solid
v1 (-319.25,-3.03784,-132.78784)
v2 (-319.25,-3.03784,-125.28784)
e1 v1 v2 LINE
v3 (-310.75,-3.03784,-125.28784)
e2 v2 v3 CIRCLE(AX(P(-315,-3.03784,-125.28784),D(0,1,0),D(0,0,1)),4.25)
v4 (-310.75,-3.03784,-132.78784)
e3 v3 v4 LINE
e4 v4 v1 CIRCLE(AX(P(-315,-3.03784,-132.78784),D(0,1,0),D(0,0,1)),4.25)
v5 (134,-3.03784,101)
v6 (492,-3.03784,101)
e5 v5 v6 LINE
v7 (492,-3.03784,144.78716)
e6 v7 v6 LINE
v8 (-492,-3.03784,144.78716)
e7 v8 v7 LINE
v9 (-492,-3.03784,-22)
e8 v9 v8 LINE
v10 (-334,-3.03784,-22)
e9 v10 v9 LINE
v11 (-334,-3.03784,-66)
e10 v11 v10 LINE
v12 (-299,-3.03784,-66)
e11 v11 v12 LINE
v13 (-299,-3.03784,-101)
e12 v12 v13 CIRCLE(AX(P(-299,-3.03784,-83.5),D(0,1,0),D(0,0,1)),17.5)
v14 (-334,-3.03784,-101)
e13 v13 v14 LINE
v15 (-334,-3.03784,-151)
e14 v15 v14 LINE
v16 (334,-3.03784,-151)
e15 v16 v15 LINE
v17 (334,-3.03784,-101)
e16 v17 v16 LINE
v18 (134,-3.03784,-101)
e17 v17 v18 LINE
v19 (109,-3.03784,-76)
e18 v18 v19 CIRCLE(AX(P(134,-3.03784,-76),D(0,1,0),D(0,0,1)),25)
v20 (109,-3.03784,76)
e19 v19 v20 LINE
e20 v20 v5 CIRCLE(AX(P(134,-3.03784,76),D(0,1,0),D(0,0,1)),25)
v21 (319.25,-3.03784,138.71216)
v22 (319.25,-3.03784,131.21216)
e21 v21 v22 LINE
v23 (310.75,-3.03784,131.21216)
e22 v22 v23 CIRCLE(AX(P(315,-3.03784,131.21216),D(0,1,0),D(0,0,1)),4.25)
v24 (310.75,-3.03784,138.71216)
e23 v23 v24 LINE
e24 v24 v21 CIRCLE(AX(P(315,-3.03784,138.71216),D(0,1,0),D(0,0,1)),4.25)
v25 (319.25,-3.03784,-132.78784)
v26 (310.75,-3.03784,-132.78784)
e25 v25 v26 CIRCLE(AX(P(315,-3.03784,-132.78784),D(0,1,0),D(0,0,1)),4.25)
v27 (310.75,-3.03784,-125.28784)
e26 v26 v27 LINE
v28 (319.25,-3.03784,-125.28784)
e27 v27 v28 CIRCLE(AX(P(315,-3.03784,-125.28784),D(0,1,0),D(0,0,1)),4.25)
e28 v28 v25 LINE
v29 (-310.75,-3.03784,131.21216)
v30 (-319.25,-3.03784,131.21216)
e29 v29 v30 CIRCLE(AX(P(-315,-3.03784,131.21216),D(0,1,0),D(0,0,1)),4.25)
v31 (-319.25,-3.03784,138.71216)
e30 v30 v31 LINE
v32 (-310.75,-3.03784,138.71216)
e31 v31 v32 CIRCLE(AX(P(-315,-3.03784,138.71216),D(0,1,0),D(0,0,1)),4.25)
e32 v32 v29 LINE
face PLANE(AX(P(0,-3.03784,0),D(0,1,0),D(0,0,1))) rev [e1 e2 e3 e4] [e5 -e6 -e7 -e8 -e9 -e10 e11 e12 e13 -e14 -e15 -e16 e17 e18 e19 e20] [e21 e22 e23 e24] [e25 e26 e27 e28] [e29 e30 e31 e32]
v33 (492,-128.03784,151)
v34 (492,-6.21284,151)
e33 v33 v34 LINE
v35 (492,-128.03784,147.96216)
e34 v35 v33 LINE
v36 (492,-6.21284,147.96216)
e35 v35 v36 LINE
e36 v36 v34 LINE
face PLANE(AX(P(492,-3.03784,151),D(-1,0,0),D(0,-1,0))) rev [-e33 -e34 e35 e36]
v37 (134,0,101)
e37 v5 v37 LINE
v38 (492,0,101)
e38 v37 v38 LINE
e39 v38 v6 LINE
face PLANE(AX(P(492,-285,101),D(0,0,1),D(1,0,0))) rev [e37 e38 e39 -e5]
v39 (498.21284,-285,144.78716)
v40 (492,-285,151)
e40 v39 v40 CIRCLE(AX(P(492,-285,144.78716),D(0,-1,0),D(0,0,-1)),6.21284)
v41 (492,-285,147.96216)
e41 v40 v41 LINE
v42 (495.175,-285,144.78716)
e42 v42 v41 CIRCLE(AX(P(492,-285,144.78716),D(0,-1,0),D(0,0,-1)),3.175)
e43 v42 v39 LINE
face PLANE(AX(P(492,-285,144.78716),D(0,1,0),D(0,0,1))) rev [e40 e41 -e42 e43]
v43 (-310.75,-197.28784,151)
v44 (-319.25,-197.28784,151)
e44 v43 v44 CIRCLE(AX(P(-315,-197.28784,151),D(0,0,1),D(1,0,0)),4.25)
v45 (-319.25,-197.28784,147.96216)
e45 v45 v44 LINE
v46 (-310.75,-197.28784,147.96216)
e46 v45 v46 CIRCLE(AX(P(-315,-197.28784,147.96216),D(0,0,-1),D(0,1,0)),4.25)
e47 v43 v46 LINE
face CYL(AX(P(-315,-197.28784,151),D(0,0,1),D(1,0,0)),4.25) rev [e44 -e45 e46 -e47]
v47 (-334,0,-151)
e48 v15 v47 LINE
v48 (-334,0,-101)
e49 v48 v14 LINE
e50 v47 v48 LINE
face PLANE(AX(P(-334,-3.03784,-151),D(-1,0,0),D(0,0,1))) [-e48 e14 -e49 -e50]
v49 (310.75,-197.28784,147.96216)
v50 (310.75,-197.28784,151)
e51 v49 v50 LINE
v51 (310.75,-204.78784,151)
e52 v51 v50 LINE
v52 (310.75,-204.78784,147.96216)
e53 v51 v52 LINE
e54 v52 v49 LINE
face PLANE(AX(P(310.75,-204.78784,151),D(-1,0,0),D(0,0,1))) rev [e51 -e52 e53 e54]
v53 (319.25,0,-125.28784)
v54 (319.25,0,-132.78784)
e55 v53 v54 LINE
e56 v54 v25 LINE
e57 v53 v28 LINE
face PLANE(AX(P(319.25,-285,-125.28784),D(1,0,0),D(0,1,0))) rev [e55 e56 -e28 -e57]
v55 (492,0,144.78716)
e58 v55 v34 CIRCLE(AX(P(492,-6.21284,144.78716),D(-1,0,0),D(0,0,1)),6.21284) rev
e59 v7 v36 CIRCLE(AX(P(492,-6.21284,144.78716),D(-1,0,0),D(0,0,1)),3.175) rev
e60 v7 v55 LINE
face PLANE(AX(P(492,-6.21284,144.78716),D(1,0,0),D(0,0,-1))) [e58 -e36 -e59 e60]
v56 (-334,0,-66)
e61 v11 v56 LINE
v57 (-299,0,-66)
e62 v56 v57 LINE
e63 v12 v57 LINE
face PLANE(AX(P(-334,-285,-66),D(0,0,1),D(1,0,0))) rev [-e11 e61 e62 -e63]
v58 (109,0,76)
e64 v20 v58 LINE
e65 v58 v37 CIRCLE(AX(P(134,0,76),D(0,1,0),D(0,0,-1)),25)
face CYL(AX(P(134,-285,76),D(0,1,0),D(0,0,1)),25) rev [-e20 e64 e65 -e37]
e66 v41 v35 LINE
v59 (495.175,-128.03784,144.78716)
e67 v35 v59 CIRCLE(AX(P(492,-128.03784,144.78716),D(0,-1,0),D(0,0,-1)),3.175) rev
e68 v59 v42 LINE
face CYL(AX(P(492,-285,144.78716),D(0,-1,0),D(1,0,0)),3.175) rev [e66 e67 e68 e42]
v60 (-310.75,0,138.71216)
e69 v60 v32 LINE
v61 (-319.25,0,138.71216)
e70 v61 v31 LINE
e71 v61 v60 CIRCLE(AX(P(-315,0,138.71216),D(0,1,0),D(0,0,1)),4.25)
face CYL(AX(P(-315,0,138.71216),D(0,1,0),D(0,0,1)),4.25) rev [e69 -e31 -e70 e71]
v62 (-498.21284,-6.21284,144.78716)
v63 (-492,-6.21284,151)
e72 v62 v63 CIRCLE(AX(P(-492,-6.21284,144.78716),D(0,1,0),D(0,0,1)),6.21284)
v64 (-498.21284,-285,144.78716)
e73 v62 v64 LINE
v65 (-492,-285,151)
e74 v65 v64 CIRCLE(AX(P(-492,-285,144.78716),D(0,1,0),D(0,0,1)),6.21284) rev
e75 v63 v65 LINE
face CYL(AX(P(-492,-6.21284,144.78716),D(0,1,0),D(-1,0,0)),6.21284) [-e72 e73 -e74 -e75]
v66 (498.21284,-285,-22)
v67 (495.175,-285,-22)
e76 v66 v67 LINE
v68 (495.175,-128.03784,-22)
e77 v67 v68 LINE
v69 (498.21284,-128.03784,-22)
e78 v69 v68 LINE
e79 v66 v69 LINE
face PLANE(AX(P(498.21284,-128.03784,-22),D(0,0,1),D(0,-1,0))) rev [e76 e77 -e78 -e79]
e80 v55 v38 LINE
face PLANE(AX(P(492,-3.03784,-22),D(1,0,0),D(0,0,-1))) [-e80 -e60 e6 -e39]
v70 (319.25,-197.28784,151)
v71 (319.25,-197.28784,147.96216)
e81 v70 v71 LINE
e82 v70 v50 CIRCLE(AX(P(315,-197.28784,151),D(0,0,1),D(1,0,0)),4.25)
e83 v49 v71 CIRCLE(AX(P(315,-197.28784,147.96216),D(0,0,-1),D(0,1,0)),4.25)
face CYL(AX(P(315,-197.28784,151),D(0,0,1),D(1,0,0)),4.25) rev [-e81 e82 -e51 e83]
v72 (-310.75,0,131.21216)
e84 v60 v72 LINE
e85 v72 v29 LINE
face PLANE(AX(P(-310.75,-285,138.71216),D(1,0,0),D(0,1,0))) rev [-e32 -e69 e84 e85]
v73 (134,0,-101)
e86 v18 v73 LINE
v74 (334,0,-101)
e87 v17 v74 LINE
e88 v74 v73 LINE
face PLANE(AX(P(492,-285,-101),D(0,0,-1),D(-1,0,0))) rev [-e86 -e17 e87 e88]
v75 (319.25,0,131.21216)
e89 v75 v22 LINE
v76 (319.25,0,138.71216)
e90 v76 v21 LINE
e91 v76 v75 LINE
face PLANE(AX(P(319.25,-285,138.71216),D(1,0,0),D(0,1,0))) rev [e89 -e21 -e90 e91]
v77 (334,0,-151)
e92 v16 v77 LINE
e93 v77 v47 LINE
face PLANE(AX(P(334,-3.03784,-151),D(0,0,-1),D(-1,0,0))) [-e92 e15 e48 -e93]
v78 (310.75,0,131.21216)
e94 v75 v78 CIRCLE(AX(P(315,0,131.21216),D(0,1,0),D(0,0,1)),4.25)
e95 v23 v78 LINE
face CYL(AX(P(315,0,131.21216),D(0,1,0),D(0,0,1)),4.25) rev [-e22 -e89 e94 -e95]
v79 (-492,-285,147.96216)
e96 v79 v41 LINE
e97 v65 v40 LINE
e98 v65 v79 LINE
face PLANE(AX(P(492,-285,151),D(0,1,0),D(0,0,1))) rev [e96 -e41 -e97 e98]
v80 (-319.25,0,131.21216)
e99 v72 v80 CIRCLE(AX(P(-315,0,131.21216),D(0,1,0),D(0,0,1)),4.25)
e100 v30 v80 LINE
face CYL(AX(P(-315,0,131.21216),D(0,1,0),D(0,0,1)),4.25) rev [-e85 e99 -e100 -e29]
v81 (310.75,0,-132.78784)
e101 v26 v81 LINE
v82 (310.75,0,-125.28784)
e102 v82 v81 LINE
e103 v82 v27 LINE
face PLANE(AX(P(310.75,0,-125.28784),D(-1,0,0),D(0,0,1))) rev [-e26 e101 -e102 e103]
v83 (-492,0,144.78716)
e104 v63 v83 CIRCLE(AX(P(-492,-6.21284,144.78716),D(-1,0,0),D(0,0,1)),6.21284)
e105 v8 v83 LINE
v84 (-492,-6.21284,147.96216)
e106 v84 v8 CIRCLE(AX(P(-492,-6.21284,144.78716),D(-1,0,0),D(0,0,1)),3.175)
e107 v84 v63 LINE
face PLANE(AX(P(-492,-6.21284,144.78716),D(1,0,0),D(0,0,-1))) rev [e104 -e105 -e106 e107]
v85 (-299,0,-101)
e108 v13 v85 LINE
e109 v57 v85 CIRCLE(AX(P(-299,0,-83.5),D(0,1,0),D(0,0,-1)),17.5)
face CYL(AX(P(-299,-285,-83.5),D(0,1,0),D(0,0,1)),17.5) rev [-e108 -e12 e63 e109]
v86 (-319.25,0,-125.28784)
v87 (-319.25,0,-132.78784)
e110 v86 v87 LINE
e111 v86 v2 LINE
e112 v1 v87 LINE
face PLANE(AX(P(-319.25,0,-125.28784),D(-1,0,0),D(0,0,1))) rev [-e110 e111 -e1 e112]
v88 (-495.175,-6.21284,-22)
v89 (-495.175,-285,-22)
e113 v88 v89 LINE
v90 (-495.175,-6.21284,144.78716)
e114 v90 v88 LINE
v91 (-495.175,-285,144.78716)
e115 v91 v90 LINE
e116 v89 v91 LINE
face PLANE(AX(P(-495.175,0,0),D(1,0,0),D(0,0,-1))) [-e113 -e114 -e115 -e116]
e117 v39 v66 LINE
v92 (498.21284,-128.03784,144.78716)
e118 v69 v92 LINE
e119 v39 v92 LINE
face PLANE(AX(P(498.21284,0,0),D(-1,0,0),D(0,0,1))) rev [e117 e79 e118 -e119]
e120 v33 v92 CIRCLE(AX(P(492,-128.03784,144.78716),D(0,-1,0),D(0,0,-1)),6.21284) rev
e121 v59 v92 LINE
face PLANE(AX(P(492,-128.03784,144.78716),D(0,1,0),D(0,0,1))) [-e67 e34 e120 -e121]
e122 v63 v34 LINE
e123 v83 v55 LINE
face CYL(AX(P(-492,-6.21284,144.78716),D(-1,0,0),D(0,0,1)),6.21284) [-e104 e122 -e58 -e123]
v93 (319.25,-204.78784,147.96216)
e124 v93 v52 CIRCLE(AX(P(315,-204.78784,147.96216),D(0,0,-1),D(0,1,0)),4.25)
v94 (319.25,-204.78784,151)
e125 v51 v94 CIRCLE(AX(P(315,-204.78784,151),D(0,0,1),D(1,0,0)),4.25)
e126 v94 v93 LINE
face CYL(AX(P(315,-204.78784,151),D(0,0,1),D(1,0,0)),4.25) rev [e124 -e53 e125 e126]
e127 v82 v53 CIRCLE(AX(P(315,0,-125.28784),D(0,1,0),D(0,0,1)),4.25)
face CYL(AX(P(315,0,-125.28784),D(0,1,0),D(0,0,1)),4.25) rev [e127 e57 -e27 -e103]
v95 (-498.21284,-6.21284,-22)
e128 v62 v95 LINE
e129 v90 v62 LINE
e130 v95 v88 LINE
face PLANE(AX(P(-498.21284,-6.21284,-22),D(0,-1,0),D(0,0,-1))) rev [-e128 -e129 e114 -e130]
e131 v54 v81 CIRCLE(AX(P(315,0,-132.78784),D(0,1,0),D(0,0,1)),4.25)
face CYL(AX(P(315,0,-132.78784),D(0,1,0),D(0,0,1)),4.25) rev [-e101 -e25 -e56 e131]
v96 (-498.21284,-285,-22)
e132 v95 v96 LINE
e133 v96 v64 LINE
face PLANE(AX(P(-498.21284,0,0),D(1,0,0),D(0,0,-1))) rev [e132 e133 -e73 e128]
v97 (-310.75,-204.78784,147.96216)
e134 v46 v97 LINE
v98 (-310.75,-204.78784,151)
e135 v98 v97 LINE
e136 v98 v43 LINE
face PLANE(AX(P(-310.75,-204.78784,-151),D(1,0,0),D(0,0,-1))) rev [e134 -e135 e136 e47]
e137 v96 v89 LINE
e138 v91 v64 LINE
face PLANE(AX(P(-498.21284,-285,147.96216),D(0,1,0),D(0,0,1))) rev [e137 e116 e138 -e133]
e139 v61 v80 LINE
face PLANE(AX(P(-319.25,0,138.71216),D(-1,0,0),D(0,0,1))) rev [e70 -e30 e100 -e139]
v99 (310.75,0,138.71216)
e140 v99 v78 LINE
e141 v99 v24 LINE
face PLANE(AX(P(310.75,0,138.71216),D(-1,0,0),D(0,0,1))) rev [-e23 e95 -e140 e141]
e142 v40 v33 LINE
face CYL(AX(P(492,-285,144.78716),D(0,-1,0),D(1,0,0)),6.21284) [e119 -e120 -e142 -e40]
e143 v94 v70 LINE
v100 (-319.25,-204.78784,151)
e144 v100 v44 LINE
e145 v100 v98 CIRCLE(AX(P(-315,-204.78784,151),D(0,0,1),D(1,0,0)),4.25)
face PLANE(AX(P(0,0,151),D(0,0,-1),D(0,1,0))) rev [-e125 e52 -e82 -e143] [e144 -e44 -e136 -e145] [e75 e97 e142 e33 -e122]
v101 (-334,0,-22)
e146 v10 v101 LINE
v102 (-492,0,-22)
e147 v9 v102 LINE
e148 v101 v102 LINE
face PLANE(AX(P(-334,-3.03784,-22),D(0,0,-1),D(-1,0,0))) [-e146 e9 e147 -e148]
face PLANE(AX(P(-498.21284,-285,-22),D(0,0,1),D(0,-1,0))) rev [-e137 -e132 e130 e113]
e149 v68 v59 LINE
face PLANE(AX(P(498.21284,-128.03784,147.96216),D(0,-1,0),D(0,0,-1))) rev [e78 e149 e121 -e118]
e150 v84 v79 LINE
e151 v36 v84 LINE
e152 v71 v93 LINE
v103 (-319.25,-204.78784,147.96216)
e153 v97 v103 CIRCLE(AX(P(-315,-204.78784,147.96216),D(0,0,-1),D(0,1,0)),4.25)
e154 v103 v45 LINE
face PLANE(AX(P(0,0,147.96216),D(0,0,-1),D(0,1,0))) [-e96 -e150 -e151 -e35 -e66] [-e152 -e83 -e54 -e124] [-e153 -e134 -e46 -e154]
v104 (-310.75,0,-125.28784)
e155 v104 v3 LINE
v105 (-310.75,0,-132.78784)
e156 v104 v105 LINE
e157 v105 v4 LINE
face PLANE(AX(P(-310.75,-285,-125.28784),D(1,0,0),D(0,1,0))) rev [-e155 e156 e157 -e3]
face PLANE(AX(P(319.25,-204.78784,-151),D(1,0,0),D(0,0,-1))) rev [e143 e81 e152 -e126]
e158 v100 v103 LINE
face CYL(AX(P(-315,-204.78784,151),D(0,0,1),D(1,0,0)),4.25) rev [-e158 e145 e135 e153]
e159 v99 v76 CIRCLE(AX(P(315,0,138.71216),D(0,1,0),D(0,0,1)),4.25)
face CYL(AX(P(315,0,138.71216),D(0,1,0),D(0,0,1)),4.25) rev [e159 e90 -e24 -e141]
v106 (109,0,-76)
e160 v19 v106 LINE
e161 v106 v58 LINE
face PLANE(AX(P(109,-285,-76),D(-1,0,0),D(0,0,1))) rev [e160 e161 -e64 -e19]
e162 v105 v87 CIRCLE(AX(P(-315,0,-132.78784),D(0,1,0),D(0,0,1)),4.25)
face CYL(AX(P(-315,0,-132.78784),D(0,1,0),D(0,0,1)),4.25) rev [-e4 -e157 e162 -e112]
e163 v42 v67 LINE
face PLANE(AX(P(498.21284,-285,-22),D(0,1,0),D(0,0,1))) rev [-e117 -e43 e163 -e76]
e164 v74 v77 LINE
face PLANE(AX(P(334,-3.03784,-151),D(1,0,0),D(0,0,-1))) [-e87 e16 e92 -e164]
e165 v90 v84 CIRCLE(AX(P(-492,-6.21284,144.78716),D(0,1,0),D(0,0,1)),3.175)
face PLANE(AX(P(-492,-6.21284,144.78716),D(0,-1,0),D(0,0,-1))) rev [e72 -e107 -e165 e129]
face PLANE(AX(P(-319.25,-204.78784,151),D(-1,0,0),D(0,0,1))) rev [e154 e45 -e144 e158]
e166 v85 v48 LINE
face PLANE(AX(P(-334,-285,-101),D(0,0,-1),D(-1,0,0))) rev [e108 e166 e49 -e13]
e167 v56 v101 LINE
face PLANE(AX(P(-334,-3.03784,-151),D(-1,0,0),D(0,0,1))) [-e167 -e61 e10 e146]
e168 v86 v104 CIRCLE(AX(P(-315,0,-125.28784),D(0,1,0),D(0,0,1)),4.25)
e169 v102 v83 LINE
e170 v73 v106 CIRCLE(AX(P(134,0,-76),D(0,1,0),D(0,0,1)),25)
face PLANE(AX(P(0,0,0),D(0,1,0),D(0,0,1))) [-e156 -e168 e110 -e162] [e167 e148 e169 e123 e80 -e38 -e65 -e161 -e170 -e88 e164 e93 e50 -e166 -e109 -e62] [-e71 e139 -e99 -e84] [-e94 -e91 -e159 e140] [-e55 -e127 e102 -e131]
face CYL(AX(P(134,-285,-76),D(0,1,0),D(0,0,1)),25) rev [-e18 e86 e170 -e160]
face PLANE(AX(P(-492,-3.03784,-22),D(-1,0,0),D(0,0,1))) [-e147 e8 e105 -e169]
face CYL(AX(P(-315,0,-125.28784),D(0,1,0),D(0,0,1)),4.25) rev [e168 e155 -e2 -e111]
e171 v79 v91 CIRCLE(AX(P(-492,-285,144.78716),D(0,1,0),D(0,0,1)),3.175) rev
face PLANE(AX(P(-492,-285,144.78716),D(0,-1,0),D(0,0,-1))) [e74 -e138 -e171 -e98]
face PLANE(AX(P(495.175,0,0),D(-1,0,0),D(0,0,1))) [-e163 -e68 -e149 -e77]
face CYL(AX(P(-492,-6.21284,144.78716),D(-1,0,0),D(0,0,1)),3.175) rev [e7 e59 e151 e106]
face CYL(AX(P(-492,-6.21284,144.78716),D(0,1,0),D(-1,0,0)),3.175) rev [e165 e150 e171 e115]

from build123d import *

# Parameters (mm, degrees)
BASE_FLANGE1_DEPTH           = 3.03784
EDGE_FLANGE1_STRIP_W         = 18.50136
EDGE_FLANGE1_STRIP_H         = 3.03784
EDGE_FLANGE1_STRIP_CUT_DEPTH = 984
EDGE_FLANGE1_DEPTH           = 984
EDGE_FLANGE2_DEPTH           = 278.78716
EDGE_FLANGE2_BEND_DEPTH      = 156.962160064
CUT_EXTRUDE1_DEPTH           = 594.499817979
CUT_EXTRUDE2_DEPTH           = 594.499817979
M6_START                     = -3.03784
M6_CLEARANCE_SLOT1_DEPTH     = 3.03784
M6_START_2                   = 147.96216
M6_CLEARANCE_SLOT2_DEPTH     = 3.03784


# Read off the part's stored shape, not the designer's step: M6 Clearance Slot1, M6 Clearance Slot2
# Sheet-metal steps are written as plain solids
with BuildPart() as part:
    # Sketch1 → Base-Flange1 (new body)
    with BuildSketch(Plane(origin=(0, 0, 0), x_dir=(1, 0, 0), z_dir=(0, 1, 0))):
        Polygon((334, 151), (-334, 151), (-334, 22), (-492, 22), (-492, -151), (334, -151), (492, -151), (492, 22), (334, 22), align=None)
    extrude(amount=-BASE_FLANGE1_DEPTH)

    # Edge-Flange1 strip (across the edge) → Edge-Flange1 strip cut (cut)
    with BuildSketch(Plane(origin=(492, -3.03784, 151), x_dir=(0, 0, -1), z_dir=(-1, 0, 0))):
        with Locations((-3.03784, -1.51892)):
            Rectangle(EDGE_FLANGE1_STRIP_W, EDGE_FLANGE1_STRIP_H)
    extrude(amount=EDGE_FLANGE1_STRIP_CUT_DEPTH, mode=Mode.SUBTRACT)

    # Edge-Flange1 section (across the edge) → Edge-Flange1 (add)
    with BuildSketch(Plane(origin=(492, -3.03784, 151), x_dir=(0, 0, -1), z_dir=(-1, 0, 0))):
        with BuildLine():
            Line((0, 3.175), (0, 281.96216))
            Line((0, 281.96216), (3.03784, 281.96216))
            Line((3.03784, 281.96216), (3.03784, 3.175))
            ThreePointArc((3.03784, 3.175), (3.96777597, 0.92993597), (6.21284, 0))
            Line((6.21284, 0), (6.21284, -3.03784))
            ThreePointArc((6.21284, -3.03784), (1.819698706, -1.218141294), (0, 3.175))
        make_face()
    extrude(amount=EDGE_FLANGE1_DEPTH)

    # Edge-Flange2 section (across the edge) → Edge-Flange2 (add)
    with BuildSketch(Plane(origin=(-495.175, -285, 147.96216), x_dir=(1, 0, 0), z_dir=(0, 1, 0))):
        with BuildLine():
            Line((-3.03784, 3.175), (-3.03784, 169.96216))
            Line((-3.03784, 169.96216), (0, 169.96216))
            Line((0, 169.96216), (0, 3.175))
            ThreePointArc((0, 3.175), (0.92993597, 0.92993597), (3.175, 0))
            Line((3.175, 0), (3.175, -3.03784))
            ThreePointArc((3.175, -3.03784), (-1.218141294, -1.218141294), (-3.03784, 3.175))
        make_face()
    extrude(amount=EDGE_FLANGE2_DEPTH)

    # Edge-Flange2 section 2 (across the edge) → Edge-Flange2 bend (add)
    with BuildSketch(Plane(origin=(495.175, -128.037839936, 147.96216), x_dir=(-1, 0, 0), z_dir=(0, -1, 0))):
        with BuildLine():
            Line((-3.03784, 3.175), (-3.03784, 169.96216))
            Line((-3.03784, 169.96216), (0, 169.96216))
            Line((0, 169.96216), (0, 3.175))
            ThreePointArc((0, 3.175), (0.92993597, 0.92993597), (3.175, 0))
            Line((3.175, 0), (3.175, -3.03784))
            ThreePointArc((3.175, -3.03784), (-1.218141294, -1.218141294), (-3.03784, 3.175))
        make_face()
    extrude(amount=EDGE_FLANGE2_BEND_DEPTH)

    # Sketch15 → Cut-Extrude1 (cut, through all)
    with BuildSketch(Plane(origin=(0, 0, 0), x_dir=(1, 0, 0), z_dir=(0, 1, 0))):
        with BuildLine():
            Line((492, 100.999999924), (134, 100.999999924))
            ThreePointArc((134, 100.999999924), (116.32233047, 93.677669454), (109, 75.999999924))
            Line((109, 75.999999924), (109, -76))
            ThreePointArc((109, -76), (116.32233047, -93.67766953), (134, -101))
            Line((134, -101), (492, -101))
            Line((492, -101), (492, 100.999999924))
        make_face()
    extrude(amount=-CUT_EXTRUDE1_DEPTH, mode=Mode.SUBTRACT)

    # Sketch16 → Cut-Extrude2 (cut, through all)
    with BuildSketch(Plane(origin=(0, 0, 0), x_dir=(1, 0, 0), z_dir=(0, 1, 0))):
        with BuildLine():
            Line((-334, 101), (-299, 101))
            ThreePointArc((-299, 101), (-281.5, 83.5), (-299, 66))
            Line((-299, 66), (-334, 66))
            Line((-334, 66), (-334, 101))
        make_face()
    extrude(amount=-CUT_EXTRUDE2_DEPTH, mode=Mode.SUBTRACT)

    # M6 Clearance Slot1 outline → M6 Clearance Slot1 (cut)
    with BuildSketch(Plane(origin=(0, 0, 0), x_dir=(1, 0, 0), z_dir=(0, 1, 0)).offset(M6_START)):
        with BuildLine():
            Line((319.25, 125.287839814), (319.25, 132.787839814))
            ThreePointArc((319.25, 132.787839814), (315, 137.037839814), (310.75, 132.787839814))
            Line((310.75, 132.787839814), (310.75, 125.287839814))
            ThreePointArc((310.75, 125.287839814), (315, 121.037839814), (319.25, 125.287839814))
        make_face()
        with BuildLine():
            ThreePointArc((319.25, -131.212160186), (315, -126.962160186), (310.75, -131.212160186))
            Line((310.75, -131.212160186), (310.75, -138.712160186))
            ThreePointArc((310.75, -138.712160186), (315, -142.962160186), (319.25, -138.712160186))
            Line((319.25, -138.712160186), (319.25, -131.212160186))
        make_face()
        with BuildLine():
            ThreePointArc((-310.75, -131.212160186), (-315, -126.962160186), (-319.25, -131.212160186))
            Line((-319.25, -131.212160186), (-319.25, -138.712160186))
            ThreePointArc((-319.25, -138.712160186), (-315, -142.962160186), (-310.75, -138.712160186))
            Line((-310.75, -138.712160186), (-310.75, -131.212160186))
        make_face()
        with BuildLine():
            ThreePointArc((-310.75, 132.787839814), (-315, 137.037839814), (-319.25, 132.787839814))
            Line((-319.25, 132.787839814), (-319.25, 125.287839814))
            ThreePointArc((-319.25, 125.287839814), (-315, 121.037839814), (-310.75, 125.287839814))
            Line((-310.75, 125.287839814), (-310.75, 132.787839814))
        make_face()
    extrude(amount=M6_CLEARANCE_SLOT1_DEPTH, mode=Mode.SUBTRACT)

    # M6 Clearance Slot2 outline → M6 Clearance Slot2 (cut)
    with BuildSketch(Plane.XY.offset(M6_START_2)):
        with BuildLine():
            ThreePointArc((319.250000047, -197.28784), (315.000000047, -193.03784), (310.750000047, -197.28784))
            Line((310.750000047, -197.28784), (310.750000047, -204.78784))
            ThreePointArc((310.750000047, -204.78784), (315.000000047, -209.03784), (319.250000047, -204.78784))
            Line((319.250000047, -204.78784), (319.250000047, -197.28784))
        make_face()
        with BuildLine():
            ThreePointArc((-310.750000047, -197.28784), (-315.000000047, -193.03784), (-319.250000047, -197.28784))
            Line((-319.250000047, -197.28784), (-319.250000047, -204.78784))
            ThreePointArc((-319.250000047, -204.78784), (-315.000000047, -209.03784), (-310.750000047, -204.78784))
            Line((-310.750000047, -204.78784), (-310.750000047, -197.28784))
        make_face()
    extrude(amount=M6_CLEARANCE_SLOT2_DEPTH, mode=Mode.SUBTRACT)


solid = part.part
